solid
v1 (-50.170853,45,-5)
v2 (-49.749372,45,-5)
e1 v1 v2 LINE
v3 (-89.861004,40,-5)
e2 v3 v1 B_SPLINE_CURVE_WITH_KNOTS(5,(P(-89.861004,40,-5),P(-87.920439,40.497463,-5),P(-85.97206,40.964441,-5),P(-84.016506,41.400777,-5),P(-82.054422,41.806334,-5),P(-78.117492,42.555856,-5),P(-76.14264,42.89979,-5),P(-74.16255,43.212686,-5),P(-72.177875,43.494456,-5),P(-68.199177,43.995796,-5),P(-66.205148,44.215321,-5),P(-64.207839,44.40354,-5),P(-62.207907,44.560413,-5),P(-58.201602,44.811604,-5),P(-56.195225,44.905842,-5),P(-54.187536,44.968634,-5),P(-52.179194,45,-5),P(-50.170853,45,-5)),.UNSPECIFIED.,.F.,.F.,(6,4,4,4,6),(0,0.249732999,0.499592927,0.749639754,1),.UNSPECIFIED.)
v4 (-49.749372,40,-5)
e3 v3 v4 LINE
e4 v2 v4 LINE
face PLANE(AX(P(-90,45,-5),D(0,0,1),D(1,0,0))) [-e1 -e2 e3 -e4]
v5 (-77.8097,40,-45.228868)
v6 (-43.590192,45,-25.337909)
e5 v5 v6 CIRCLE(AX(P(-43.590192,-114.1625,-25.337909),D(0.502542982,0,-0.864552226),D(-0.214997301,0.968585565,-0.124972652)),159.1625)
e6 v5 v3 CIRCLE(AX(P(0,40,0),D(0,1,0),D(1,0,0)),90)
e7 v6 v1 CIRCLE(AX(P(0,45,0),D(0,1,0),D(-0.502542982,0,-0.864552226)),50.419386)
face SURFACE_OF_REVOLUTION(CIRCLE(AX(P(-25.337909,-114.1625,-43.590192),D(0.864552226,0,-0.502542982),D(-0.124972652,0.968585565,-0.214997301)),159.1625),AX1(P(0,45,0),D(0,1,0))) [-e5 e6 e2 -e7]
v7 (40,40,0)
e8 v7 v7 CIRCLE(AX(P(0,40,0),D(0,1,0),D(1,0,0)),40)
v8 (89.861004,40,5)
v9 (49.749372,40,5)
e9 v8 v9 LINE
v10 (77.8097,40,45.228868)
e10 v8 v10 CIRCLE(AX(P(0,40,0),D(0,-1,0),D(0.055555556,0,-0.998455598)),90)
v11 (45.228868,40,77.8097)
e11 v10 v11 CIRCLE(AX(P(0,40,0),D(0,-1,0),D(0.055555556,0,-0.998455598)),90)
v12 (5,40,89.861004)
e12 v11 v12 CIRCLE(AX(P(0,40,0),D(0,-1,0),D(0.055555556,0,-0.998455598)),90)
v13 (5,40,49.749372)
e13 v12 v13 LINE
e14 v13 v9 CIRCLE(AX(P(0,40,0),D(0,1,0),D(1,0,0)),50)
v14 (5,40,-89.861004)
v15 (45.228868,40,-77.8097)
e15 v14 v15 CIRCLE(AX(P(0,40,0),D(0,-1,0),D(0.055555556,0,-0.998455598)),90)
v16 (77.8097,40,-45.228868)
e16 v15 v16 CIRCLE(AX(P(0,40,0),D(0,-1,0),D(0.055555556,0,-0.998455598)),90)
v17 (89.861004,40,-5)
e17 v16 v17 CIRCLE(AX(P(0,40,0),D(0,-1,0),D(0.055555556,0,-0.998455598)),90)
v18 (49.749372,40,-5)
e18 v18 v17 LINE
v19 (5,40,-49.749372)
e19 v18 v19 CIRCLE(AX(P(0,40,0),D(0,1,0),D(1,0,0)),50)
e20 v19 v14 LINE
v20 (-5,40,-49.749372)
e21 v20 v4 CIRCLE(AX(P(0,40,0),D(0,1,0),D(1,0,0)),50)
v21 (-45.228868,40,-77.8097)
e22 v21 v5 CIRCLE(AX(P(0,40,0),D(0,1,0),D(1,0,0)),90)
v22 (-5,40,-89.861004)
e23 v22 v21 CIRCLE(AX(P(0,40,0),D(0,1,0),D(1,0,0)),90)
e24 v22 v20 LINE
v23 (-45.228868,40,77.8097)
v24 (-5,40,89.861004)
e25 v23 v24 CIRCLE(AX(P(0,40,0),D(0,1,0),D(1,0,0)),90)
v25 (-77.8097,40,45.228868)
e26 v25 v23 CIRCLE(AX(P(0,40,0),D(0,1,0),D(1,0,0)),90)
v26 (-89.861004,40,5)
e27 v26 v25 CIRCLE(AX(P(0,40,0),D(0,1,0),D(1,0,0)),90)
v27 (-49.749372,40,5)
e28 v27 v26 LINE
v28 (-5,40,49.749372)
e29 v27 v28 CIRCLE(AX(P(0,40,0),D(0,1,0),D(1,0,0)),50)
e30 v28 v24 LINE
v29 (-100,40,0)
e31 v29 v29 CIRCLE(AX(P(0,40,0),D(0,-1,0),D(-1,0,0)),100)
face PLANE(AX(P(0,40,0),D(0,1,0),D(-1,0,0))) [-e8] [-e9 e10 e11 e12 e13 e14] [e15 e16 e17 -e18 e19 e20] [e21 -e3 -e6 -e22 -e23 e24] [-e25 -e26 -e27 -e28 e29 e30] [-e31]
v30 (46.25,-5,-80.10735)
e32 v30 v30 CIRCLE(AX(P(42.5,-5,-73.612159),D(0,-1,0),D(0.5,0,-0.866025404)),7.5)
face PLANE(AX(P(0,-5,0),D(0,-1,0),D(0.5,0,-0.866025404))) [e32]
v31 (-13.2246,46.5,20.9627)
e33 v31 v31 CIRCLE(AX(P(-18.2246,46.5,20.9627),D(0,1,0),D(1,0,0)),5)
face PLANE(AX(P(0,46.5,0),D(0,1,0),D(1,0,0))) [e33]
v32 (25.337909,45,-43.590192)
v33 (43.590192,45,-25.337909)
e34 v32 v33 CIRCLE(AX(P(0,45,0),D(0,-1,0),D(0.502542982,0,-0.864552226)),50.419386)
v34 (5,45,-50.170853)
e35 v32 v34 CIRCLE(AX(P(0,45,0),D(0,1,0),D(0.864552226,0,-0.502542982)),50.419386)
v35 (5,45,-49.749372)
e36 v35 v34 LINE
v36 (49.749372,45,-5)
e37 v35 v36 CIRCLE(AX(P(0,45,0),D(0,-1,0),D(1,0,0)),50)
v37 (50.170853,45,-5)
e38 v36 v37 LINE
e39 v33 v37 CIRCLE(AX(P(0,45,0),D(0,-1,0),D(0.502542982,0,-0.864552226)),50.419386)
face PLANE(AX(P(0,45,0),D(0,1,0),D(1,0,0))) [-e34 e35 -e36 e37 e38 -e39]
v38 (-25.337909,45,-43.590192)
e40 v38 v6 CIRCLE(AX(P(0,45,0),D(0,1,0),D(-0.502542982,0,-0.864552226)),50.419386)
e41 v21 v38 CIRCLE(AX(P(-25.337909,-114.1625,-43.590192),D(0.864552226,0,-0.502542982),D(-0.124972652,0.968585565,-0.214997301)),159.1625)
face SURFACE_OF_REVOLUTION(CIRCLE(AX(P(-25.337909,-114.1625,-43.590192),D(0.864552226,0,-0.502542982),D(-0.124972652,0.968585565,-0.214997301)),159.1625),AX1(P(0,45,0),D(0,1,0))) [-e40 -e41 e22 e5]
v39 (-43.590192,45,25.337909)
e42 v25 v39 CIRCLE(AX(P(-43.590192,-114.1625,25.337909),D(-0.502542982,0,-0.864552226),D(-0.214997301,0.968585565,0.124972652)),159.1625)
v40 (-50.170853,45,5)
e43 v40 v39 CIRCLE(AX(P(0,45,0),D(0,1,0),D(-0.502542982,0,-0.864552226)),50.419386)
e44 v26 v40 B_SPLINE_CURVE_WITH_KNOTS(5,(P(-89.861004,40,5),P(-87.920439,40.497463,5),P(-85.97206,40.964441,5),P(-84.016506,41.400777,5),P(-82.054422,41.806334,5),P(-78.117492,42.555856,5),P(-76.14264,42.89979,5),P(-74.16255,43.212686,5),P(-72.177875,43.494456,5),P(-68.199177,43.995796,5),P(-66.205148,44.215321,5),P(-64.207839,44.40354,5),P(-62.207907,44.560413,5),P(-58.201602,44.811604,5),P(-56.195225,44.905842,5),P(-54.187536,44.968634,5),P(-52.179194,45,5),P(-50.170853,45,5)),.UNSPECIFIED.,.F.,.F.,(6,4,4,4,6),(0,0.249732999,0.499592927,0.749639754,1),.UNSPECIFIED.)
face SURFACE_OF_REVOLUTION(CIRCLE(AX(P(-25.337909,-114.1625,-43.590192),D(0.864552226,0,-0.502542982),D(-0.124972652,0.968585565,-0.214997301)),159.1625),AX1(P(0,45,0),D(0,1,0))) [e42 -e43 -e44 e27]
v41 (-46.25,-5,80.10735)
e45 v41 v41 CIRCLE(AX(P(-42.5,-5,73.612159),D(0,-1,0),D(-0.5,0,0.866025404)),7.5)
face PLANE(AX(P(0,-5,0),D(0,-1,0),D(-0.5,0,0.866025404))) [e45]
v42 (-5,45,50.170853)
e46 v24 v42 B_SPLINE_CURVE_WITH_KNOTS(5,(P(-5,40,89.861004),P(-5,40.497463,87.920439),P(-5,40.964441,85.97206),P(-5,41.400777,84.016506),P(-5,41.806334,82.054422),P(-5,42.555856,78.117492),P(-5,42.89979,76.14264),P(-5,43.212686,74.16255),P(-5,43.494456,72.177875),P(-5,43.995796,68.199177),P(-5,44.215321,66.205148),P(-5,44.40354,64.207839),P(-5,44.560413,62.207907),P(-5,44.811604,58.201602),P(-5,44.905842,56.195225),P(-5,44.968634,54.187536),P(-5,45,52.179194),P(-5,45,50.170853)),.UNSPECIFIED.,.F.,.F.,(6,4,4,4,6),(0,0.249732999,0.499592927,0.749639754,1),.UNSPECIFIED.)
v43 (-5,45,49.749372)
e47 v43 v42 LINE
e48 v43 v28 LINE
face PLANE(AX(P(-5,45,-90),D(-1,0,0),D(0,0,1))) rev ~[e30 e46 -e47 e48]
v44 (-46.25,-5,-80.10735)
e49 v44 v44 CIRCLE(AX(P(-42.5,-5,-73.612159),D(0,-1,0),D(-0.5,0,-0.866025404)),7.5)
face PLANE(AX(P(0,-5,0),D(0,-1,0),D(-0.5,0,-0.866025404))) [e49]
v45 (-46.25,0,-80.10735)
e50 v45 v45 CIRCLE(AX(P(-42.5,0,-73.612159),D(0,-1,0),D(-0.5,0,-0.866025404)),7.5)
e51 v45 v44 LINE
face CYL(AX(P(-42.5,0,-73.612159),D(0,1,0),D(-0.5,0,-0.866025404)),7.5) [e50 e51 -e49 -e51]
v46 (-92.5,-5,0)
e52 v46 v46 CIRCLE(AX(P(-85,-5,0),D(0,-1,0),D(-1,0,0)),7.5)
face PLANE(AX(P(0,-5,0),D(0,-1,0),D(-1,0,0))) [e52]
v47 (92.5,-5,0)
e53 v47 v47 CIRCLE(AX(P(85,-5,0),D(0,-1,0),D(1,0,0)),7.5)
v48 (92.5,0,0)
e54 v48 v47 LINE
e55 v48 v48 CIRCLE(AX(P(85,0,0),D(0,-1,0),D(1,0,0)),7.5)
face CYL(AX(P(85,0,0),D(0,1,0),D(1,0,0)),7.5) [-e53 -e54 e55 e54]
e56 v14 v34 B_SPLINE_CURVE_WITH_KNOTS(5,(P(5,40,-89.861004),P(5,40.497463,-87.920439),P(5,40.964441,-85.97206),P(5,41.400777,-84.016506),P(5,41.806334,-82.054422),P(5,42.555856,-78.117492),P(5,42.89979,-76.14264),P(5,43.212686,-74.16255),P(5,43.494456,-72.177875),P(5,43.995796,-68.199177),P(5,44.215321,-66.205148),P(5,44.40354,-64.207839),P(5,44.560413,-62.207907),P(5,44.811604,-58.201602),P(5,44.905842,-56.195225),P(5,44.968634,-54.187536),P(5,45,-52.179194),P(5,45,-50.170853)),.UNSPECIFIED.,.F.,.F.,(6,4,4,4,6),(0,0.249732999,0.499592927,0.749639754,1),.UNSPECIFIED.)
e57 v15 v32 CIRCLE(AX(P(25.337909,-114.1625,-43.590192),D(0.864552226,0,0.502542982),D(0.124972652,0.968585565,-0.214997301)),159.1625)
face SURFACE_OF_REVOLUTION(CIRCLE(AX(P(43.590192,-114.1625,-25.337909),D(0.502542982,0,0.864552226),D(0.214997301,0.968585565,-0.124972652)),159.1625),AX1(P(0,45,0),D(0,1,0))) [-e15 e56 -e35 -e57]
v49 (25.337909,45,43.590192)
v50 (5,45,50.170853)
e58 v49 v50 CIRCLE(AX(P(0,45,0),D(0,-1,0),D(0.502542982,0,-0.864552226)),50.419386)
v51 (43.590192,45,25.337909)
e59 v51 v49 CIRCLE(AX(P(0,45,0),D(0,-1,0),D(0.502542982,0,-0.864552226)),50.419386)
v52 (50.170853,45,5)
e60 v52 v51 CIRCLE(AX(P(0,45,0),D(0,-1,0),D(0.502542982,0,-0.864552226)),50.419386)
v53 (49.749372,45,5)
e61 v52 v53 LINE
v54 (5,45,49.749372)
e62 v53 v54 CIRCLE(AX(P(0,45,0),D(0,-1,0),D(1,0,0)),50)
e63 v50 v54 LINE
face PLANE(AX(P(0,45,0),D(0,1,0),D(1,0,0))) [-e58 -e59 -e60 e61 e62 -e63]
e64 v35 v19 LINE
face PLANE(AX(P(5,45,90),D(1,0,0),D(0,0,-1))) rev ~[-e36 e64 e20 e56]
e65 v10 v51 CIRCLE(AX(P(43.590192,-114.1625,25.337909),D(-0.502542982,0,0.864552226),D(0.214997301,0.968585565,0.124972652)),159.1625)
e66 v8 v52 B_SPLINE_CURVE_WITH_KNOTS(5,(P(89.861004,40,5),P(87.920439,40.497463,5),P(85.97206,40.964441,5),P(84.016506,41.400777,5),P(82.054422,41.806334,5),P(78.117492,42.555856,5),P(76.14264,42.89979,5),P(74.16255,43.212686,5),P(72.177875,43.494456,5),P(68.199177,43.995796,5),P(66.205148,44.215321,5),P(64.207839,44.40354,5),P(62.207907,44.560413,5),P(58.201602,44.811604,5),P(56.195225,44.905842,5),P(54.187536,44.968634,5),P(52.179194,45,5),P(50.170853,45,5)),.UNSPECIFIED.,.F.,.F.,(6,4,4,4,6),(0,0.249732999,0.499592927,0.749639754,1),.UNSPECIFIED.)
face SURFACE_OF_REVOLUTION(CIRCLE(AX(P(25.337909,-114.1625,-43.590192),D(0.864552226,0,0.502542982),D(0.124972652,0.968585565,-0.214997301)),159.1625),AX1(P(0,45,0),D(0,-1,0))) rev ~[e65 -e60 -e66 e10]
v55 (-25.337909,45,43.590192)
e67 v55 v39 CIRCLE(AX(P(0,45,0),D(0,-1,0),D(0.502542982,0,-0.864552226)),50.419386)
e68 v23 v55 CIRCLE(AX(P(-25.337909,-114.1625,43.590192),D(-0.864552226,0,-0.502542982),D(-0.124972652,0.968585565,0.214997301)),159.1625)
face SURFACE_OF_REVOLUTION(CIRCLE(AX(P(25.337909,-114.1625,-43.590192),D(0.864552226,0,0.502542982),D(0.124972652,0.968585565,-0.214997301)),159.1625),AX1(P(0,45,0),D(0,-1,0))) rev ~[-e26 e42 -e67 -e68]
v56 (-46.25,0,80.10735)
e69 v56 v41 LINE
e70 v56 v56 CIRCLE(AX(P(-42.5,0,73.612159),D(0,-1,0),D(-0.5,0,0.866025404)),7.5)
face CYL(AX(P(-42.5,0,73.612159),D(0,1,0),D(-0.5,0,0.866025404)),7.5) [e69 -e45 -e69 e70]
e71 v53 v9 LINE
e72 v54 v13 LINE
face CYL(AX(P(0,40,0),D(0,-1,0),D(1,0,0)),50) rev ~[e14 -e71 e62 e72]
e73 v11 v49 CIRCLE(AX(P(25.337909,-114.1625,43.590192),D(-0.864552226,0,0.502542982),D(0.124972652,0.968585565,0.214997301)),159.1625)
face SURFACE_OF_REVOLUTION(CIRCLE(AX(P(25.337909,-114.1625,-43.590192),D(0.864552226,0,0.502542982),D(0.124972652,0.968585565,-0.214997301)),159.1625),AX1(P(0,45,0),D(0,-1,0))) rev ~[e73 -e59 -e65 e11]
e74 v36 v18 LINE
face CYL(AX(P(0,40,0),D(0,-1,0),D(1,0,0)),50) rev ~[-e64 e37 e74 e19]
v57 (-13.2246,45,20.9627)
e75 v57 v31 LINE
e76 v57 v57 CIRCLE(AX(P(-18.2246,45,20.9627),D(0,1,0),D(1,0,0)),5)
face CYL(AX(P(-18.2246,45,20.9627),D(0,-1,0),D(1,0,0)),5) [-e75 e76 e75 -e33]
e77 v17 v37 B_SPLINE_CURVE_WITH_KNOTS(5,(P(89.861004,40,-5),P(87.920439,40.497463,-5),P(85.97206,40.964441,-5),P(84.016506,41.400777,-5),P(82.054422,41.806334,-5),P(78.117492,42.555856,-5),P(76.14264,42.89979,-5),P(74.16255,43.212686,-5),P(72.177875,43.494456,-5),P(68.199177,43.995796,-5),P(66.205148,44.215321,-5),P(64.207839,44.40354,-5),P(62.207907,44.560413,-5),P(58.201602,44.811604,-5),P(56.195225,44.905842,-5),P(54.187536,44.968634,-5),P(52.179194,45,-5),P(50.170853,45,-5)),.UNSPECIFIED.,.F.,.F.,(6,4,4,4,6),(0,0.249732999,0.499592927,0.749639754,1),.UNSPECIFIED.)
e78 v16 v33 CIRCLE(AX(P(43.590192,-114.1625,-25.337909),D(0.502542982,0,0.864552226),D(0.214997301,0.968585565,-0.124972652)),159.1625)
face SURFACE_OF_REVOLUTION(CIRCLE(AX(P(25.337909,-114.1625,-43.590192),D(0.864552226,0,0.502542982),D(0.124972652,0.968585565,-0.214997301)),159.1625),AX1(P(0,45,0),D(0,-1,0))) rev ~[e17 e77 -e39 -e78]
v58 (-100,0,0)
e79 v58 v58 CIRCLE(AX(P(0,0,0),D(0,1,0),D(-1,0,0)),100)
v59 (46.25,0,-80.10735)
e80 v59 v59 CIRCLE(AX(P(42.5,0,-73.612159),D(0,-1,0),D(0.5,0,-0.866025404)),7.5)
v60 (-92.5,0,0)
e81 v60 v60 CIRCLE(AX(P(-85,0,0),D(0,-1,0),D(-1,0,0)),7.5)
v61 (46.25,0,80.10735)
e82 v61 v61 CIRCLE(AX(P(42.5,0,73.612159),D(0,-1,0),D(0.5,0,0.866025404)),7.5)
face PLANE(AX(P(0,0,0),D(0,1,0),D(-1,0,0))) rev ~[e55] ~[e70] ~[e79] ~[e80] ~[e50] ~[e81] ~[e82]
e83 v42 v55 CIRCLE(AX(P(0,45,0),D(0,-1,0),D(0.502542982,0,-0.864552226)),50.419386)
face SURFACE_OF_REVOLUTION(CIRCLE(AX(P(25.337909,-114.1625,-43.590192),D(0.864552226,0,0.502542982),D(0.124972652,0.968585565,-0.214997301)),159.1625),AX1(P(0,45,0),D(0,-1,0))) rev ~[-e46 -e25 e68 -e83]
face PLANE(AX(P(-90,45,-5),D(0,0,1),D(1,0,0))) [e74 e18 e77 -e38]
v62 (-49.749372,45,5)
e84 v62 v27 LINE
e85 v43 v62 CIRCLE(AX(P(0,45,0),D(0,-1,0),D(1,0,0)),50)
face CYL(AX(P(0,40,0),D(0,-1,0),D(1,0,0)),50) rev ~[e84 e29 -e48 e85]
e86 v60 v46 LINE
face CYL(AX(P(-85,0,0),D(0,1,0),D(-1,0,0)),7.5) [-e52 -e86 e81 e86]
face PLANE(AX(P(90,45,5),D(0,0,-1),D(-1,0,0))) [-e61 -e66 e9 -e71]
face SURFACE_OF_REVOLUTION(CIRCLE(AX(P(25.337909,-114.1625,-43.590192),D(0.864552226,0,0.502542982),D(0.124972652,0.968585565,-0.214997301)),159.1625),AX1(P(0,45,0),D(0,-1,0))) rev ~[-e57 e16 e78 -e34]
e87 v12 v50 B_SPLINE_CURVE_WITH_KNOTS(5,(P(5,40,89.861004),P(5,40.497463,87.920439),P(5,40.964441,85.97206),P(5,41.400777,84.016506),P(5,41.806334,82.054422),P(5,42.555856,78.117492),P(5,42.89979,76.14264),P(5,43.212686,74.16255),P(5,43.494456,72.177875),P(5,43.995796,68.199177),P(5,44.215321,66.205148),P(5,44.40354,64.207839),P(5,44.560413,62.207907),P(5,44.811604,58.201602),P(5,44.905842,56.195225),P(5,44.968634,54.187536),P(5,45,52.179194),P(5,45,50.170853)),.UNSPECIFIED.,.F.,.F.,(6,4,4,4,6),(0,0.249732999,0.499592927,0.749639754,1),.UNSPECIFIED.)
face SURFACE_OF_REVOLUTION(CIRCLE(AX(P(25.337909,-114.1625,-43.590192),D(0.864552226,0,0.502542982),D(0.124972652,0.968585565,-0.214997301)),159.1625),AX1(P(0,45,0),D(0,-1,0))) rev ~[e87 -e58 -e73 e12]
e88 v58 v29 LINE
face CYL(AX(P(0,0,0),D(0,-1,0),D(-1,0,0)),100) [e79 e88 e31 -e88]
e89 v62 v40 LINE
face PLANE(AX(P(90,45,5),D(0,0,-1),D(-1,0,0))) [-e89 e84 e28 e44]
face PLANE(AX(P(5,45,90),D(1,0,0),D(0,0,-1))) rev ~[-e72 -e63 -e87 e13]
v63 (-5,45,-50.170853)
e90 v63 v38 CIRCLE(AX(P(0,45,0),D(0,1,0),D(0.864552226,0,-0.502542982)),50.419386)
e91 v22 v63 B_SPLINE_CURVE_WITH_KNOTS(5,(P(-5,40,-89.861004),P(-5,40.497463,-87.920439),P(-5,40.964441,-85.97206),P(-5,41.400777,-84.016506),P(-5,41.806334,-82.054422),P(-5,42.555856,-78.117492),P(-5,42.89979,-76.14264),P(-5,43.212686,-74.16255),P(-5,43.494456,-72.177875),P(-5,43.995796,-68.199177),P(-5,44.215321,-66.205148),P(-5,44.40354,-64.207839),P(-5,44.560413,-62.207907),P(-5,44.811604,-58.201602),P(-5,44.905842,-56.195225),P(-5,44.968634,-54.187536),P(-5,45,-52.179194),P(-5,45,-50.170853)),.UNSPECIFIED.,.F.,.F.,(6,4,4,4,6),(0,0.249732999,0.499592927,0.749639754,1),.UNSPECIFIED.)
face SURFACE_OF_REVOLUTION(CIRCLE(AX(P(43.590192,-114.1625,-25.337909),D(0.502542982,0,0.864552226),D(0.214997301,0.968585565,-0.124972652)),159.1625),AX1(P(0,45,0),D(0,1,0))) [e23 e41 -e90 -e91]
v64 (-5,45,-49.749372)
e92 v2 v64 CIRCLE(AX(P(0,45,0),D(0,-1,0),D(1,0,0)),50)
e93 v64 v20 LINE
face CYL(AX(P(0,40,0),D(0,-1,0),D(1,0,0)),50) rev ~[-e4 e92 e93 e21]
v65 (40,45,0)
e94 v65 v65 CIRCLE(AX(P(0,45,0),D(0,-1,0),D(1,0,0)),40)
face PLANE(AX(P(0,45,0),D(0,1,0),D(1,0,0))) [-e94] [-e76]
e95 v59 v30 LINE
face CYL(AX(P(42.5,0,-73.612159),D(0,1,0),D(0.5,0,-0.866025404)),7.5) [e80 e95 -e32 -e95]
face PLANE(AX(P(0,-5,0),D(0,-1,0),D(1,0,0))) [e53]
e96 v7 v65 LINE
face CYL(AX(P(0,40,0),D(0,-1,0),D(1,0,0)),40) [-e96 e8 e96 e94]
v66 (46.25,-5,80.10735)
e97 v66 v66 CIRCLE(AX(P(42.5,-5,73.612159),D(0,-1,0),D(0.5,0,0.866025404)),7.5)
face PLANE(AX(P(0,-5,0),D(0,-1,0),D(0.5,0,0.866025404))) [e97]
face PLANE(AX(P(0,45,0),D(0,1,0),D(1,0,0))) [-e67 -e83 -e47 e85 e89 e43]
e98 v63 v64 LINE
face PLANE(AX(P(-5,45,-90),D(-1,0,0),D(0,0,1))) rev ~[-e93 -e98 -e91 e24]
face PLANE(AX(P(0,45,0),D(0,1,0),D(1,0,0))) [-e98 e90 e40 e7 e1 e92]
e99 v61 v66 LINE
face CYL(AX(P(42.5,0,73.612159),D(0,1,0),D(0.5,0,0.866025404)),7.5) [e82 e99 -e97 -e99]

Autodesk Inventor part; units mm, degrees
ref_plane "YZ Plane" through (0, 0, 0) normal (1, 0, 0) x (0, 1, 0)
ref_plane "XZ Plane" through (0, 0, 0) normal (0, 1, 0) x (-1, 0, 0)
ref_plane "XY Plane" through (0, 0, 0) normal (0, 0, 1) x (1, 0, 0)
sketch "Sketch1" plane through (0, 0, 0) normal (0, 1, 0) x (-1, 0, 0)
  circle A0 centre (0, 0) radius 100
  dimension "d0" = 200
extrude "Extrusion1" add sketch "Sketch1" along normal blind 40
sketch "Sketch2" plane through (0, 40, 0) normal (0, 1, 0) x (1, 0, 0)
  circle A0 centre (0, 0) radius 90
  dimension "d3" = 180
extrude "Extrusion2" add sketch "Sketch2" along normal blind 5
sketch "Sketch3" plane through (0, 45, 0) normal (0, 1, 0) x (1, 0, 0)
  point P0 (0, 0)
sketch "Sketch4" plane through (0, 45, 0) normal (0, 1, 0) x (1, 0, 0)
  point P0 (0, 0)
sketch "Sketch5" plane through (0, 45, 0) normal (0, 1, 0) x (1, 0, 0)
  line L0 (-5, -90) -> (5, -90)
  line L1 (5, -90) -> (5, 90)
  line L2 (5, 90) -> (-5, 90)
  line L3 (-5, 90) -> (-5, -90)
  line L4 (-5, -90) -> (5, 90) construction
  line L5 (5, -90) -> (-5, 90) construction
  point P0 (0, 0)
  dimension "d6" = 10
  dimension "d7" = 180
extrude "Extrusion3" cut sketch "Sketch5" against normal blind 5
sketch "Sketch6" plane through (0, 45, 0) normal (0, 1, 0) x (1, 0, 0)
  line L0 (-90, 5) -> (90, 5)
  line L1 (90, 5) -> (90, -5)
  line L2 (90, -5) -> (-90, -5)
  line L3 (-90, -5) -> (-90, 5)
  line L4 (-90, 5) -> (90, -5) construction
  line L5 (90, 5) -> (-90, -5) construction
  point P0 (0, 0)
  dimension "d10" = 180
  dimension "d11" = 10
extrude "Extrusion4" cut sketch "Sketch6" against normal blind 5
sketch "Sketch7" plane through (0, 40, 0) normal (0, 1, 0) x (1, 0, 0)
  point P0 (0, 0)
sketch "Sketch8" plane through (0, 40, 0) normal (0, 1, 0) x (1, 0, 0)
  circle A0 centre (0, 0) radius 50
  dimension "d14" = 100
extrude "Extrusion6" cut sketch "Sketch8" along normal blind 10
sketch "Sketch10" plane through (0, 40, 0) normal (0, 1, 0) x (1, 0, 0)
  circle A0 centre (0, 0) radius 40
  dimension "d20" = 80
extrude "Extrusion7" add sketch "Sketch10" along normal blind 5
sketch "Sketch11" plane through (0, 0, 0) normal (0, -1, 0) x (1, 0, 0)
  circle A0 centre (85, 0) radius 7.5
  point P0 (0, 0)
  dimension "d23" = 15
extrude "Extrusion8" add sketch "Sketch11" along normal blind 5
pattern_circular "Circular Pattern1" count 6 over 360 about axis through (0, 0, 0) along (0, 1, 0) of "Extrusion8", "Extrusion1", "Extrusion7"
fillet "Fillet1" radius 159.1625 4 edges at (63.6396, 45, 63.6396) (-63.6396, 45, 63.6396) (-63.6396, 45, -63.6396) (63.6396, 45, -63.6396)
sketch "Sketch12" plane through (0, 45, 0) normal (0, 1, 0) x (1, 0, 0)
  point P0 (0, 0)
sketch "Sketch13" plane through (0, 45, 0) normal (0, 1, 0) x (1, 0, 0)
  circle A0 centre (-18.2246, -20.9627) radius 5
  point P0 (0, 0)
  dimension "d30" = 10
extrude "Extrusion9" add sketch "Sketch13" along normal mid plane 3
properties part number "Simon"
